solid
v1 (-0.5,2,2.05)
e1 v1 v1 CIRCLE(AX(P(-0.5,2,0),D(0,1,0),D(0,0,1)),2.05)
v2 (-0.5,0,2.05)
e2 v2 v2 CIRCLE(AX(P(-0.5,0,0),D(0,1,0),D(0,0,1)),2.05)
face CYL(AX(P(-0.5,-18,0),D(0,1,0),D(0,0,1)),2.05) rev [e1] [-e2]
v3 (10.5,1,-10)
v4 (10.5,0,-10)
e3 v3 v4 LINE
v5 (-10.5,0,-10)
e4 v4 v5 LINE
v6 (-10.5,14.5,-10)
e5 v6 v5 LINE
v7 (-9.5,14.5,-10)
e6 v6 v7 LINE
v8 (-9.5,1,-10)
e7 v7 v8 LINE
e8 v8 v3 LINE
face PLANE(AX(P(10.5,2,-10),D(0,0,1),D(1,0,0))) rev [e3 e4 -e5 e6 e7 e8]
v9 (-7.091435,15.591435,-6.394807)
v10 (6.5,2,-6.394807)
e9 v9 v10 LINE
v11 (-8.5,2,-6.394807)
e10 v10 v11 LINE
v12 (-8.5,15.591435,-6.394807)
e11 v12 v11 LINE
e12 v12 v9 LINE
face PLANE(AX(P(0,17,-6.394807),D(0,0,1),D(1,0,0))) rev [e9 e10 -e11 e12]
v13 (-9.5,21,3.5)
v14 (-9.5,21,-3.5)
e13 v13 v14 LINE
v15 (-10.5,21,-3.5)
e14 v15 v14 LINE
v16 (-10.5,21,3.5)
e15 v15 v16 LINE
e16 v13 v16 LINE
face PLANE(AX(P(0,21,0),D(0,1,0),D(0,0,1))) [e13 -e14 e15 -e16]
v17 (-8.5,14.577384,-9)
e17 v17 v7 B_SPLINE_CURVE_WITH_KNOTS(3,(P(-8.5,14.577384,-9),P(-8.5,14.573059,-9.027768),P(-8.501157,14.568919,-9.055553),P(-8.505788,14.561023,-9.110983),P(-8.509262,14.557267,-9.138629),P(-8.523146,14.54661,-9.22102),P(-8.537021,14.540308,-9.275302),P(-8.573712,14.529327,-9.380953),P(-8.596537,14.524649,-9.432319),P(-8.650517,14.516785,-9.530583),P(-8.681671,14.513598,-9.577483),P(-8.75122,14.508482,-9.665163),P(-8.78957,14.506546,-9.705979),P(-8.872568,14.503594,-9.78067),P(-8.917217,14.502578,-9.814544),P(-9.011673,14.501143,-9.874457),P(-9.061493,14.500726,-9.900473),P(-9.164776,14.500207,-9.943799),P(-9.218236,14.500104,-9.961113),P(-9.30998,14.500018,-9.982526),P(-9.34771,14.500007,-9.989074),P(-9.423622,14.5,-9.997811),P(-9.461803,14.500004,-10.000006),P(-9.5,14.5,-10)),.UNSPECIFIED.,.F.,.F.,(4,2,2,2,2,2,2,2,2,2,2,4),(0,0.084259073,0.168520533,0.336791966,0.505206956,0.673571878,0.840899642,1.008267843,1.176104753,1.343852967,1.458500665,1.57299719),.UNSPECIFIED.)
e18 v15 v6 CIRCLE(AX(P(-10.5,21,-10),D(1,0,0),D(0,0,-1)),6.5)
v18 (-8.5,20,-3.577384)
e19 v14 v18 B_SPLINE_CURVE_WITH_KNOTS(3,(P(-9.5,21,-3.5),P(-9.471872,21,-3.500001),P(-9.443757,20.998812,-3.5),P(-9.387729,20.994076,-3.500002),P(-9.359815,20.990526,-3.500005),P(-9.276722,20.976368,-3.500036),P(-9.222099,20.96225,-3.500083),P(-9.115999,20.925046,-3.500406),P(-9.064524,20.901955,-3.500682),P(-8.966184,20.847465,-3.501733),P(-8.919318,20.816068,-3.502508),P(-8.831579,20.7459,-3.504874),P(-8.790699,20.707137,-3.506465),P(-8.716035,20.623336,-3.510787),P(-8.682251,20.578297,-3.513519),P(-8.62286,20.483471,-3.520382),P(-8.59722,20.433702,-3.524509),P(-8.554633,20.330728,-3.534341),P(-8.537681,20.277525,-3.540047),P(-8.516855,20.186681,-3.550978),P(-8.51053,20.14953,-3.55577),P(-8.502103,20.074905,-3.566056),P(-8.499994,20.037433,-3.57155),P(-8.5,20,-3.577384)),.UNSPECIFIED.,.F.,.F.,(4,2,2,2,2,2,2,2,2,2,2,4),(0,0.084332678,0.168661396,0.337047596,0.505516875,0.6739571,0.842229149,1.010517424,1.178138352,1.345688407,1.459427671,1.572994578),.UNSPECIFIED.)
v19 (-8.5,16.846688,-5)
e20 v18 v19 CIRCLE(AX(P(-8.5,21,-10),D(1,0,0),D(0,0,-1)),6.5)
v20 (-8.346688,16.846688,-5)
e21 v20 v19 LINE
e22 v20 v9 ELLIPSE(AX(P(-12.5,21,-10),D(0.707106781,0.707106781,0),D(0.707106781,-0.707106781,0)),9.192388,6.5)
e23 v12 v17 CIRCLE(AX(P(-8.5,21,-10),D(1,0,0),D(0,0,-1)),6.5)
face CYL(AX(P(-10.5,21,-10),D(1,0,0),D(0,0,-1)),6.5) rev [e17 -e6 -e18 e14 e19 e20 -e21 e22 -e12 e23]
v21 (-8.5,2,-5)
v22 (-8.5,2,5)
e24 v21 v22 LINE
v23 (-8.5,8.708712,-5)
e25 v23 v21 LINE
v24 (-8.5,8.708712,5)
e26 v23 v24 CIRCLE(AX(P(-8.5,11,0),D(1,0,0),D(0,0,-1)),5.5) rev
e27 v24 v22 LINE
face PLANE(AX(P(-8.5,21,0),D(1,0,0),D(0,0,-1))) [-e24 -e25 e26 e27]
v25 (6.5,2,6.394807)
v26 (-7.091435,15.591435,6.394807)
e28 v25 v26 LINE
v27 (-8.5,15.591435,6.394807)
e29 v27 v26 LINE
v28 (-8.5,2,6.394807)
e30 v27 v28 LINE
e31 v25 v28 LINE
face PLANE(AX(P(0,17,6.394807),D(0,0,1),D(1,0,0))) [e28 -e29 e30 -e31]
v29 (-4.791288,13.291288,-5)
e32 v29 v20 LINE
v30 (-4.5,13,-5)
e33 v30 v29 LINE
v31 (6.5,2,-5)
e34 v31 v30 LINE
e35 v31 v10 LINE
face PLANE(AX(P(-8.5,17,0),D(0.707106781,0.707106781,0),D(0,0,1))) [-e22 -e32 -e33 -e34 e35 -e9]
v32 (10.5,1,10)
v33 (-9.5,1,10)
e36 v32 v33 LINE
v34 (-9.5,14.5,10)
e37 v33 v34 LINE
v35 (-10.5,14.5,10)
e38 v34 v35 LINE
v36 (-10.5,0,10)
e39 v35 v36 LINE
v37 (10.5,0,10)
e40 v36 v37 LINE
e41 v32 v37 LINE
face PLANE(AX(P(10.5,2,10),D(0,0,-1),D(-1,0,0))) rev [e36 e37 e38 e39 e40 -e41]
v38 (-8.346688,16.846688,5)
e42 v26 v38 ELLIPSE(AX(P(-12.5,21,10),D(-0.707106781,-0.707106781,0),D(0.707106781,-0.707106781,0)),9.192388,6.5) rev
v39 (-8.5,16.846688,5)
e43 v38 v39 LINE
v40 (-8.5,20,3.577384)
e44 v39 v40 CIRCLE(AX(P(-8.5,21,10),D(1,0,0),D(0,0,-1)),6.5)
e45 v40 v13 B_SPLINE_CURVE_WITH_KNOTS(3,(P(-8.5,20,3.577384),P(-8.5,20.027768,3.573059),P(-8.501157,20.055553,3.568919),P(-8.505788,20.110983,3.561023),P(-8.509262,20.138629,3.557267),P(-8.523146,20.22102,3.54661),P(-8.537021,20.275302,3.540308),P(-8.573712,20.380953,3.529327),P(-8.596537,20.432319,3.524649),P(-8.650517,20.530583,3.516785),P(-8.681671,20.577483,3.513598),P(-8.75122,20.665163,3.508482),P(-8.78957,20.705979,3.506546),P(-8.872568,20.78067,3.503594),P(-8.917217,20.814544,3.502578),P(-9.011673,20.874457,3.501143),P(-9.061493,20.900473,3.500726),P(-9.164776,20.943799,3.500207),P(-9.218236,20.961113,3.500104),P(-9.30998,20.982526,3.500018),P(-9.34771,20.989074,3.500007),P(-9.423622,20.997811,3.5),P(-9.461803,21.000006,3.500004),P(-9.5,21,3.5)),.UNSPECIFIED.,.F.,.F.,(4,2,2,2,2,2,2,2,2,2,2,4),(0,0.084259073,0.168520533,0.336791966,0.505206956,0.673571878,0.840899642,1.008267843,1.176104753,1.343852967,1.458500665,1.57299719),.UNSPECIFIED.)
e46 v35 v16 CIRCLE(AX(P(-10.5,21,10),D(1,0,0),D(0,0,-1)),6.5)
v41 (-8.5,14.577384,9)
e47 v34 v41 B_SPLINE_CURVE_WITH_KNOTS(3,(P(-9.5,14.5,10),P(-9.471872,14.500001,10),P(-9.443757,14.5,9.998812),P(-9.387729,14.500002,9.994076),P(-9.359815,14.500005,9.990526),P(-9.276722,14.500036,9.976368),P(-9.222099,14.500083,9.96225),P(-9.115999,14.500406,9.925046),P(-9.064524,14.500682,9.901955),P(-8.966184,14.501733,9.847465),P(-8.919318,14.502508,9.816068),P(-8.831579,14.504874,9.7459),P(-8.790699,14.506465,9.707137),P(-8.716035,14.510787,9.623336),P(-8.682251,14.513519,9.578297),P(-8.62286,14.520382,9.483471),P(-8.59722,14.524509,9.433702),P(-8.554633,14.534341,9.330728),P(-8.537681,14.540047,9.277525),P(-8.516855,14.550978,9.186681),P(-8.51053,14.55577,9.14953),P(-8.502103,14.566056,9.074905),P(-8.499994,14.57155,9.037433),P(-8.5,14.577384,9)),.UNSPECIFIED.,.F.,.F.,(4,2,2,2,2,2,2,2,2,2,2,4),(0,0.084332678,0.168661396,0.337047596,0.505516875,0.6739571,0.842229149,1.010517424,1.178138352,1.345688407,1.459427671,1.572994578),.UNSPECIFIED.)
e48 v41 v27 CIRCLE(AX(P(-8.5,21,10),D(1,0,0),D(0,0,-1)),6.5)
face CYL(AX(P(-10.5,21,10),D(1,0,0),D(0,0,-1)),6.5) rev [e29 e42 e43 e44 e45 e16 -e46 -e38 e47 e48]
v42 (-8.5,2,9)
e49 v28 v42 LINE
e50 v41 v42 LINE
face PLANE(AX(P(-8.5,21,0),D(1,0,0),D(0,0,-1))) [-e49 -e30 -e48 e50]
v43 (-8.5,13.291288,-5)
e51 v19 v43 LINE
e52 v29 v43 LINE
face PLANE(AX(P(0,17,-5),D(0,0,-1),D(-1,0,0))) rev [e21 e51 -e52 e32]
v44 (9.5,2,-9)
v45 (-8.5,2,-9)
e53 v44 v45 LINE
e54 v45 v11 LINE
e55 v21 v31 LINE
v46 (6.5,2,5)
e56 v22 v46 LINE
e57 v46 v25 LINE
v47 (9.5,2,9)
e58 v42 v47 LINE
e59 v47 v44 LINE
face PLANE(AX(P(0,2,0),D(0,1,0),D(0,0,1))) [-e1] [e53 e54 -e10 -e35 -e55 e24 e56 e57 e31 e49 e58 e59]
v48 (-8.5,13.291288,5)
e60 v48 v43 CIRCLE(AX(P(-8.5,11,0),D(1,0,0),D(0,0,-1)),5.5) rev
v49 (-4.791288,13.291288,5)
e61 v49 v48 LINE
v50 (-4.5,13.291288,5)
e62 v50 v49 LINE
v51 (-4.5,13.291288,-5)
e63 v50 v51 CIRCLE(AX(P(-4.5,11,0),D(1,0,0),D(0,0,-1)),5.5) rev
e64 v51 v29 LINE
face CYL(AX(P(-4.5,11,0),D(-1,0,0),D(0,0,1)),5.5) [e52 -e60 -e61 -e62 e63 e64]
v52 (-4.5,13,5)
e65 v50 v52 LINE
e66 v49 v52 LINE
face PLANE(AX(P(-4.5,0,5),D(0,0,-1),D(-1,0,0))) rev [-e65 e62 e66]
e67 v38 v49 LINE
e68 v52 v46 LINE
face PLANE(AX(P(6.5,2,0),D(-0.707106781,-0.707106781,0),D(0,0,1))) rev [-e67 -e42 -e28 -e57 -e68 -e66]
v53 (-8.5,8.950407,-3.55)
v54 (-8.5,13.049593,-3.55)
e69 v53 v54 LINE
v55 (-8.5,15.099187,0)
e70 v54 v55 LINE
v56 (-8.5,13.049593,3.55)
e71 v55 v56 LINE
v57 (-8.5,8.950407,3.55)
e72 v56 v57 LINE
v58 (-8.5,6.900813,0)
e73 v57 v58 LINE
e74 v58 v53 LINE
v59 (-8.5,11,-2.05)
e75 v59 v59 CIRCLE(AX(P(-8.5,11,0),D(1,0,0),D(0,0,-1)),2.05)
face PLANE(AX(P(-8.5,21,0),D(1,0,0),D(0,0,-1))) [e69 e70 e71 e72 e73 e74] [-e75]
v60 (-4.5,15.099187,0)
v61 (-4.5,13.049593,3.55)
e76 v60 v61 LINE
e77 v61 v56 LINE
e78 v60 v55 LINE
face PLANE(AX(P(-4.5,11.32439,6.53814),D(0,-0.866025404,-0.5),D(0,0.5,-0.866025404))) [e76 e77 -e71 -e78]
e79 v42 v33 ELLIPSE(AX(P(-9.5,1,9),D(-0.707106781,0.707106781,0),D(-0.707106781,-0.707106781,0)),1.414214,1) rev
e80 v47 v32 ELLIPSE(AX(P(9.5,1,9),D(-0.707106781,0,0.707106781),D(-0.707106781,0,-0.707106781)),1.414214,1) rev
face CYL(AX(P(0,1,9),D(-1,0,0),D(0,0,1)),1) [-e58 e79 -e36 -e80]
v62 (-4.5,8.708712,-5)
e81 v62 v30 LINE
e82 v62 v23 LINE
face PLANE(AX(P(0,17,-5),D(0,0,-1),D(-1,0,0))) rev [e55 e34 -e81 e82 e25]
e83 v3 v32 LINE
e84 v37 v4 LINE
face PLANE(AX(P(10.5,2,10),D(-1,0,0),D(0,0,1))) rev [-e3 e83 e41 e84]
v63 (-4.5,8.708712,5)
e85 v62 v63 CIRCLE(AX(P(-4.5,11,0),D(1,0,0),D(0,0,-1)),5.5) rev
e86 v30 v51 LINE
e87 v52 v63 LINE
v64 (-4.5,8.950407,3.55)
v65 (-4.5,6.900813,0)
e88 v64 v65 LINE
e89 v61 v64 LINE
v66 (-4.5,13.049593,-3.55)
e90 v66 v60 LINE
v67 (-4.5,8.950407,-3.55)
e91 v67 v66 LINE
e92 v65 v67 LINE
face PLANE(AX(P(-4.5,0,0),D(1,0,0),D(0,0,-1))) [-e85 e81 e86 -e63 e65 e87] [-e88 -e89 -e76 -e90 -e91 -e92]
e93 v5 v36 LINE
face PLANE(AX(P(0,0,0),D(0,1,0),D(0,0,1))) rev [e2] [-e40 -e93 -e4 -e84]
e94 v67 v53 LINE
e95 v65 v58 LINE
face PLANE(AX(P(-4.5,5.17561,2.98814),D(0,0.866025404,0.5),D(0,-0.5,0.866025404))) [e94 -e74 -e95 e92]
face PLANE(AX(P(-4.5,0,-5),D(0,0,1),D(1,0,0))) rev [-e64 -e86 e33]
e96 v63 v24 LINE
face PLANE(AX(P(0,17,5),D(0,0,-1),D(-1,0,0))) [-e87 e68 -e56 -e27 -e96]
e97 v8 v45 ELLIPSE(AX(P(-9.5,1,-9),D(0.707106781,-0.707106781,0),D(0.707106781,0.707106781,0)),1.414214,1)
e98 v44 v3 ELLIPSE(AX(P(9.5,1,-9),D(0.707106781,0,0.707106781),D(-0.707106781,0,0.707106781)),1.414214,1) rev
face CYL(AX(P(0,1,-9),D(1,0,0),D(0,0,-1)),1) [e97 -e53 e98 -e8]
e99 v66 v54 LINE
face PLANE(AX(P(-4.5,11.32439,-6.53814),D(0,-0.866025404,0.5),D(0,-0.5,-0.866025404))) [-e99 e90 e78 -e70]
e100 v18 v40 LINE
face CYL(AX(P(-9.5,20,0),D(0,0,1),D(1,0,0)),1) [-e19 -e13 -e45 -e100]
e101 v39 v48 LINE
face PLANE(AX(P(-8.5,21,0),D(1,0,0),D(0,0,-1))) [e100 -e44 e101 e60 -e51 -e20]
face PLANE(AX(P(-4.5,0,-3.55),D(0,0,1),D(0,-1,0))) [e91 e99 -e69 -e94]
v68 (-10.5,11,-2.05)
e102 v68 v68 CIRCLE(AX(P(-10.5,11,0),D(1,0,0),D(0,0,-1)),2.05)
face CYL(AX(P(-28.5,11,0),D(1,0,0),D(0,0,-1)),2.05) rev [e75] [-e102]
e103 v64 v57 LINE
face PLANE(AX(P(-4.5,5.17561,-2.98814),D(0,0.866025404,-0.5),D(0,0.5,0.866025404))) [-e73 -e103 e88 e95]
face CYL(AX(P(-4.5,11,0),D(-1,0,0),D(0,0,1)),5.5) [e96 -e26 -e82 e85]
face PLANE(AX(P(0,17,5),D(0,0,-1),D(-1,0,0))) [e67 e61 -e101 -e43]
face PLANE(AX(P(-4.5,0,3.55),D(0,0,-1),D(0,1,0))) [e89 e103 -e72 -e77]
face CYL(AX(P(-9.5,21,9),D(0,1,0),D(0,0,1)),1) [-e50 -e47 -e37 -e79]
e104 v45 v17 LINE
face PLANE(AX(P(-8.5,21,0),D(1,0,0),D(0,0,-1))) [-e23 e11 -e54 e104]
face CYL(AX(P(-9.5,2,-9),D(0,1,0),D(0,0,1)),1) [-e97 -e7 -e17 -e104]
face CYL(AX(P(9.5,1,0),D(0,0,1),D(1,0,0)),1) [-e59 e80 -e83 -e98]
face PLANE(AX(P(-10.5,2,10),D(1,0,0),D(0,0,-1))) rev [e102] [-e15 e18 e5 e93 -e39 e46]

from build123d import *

# Parameters (mm, degrees)
ESQUISSE1_W                  = 21
ESQUISSE1_H                  = 20
BOSS_EXTRU_1_DEPTH           = 2
ESQUISSE2_W                  = 2
ESQUISSE2_H                  = 20
BOSS_EXTRU_2_DEPTH           = 19
ESQUISSE3_R                  = 2.05
ENL_V_MAT_EXTRU_1_DEPTH      = 20
ESQUISSE4_R                  = 2.05
ENL_V_MAT_EXTRU_2_DEPTH      = 20
ESQUISSE5_W                  = 15
ESQUISSE5_H                  = 1.39480656
BOSS_EXTRU_3_DEPTH           = 15
CHANFREIN1_SIZE              = 15
CONG_1_R                     = 1
BOSS_EXTRU_12_DEPTH          = 4
ENL_V_MAT_EXTRU_3_DEPTH      = 26.51960031
ENL_V_MAT_EXTRU_3_DEPTH_BACK = 26.51960031
ESQUISSE9_R                  = 6.5


with BuildPart() as part:
    # Esquisse1 → Boss.-Extru.1 (new body)
    with BuildSketch(Plane(origin=(0, 0, 0), x_dir=(1, 0, 0), z_dir=(0, 1, 0))):
        Rectangle(ESQUISSE1_W, ESQUISSE1_H)
    extrude(amount=BOSS_EXTRU_1_DEPTH)

    # Esquisse2 → Boss.-Extru.2 (add)
    with BuildSketch(Plane(origin=(0, 2, 0), x_dir=(1, 0, 0), z_dir=(0, 1, 0))):
        with Locations((-9.5, 0)):
            Rectangle(ESQUISSE2_W, ESQUISSE2_H)
    extrude(amount=BOSS_EXTRU_2_DEPTH)

    # Esquisse3 → Enlèv. mat.-Extru.1 (cut)
    with BuildSketch(Plane(origin=(0, 2, 0), x_dir=(1, 0, 0), z_dir=(0, 1, 0))):
        with Locations(Location((-0.5, 0, 0), (0, 0, 270))):
            Circle(ESQUISSE3_R)
    extrude(amount=-ENL_V_MAT_EXTRU_1_DEPTH, mode=Mode.SUBTRACT)

    # Esquisse4 → Enlèv. mat.-Extru.2 (cut)
    with BuildSketch(Plane(origin=(-8.5, 0, 0), x_dir=(0, 0, -1), z_dir=(1, 0, 0))):
        with Locations((0, 11)):
            Circle(ESQUISSE4_R)
    extrude(amount=-ENL_V_MAT_EXTRU_2_DEPTH, mode=Mode.SUBTRACT)

    # Esquisse5 → Boss.-Extru.3 (add)
    with BuildSketch(Plane(origin=(0, 2, 0), x_dir=(1, 0, 0), z_dir=(0, 1, 0))):
        with Locations((-1, -5.69740328)):
            Rectangle(ESQUISSE5_W, ESQUISSE5_H)
        with Locations((-1, 5.69740328)):
            Rectangle(ESQUISSE5_W, ESQUISSE5_H)
    extrude(amount=BOSS_EXTRU_3_DEPTH)

    # Chanfrein1
    chanfrein1_edges = [part.edges().sort_by_distance(p)[0] for p in [
        (6.5, 17, 5.69740328),
        (6.5, 17, -5.69740328),
    ]]
    chamfer(chanfrein1_edges, length=CHANFREIN1_SIZE - 0.0001)  # a hair under: the kernel refuses the full size

    # Congé1
    cong_1_edges = [part.edges().sort_by_distance(p)[0] for p in [
        (10.5, 2, 0),
        (1, 2, 10),
        (-8.5, 21, 0),
        (-8.5, 11.5, 10),
        (-8.5, 11.5, -10),
        (1, 2, -10),
    ]]
    fillet(cong_1_edges, radius=CONG_1_R)

    # Esquisse7 → Boss.-Extru.12 (add)
    with BuildSketch(Plane(origin=(-8.5, 0, 0), x_dir=(0, 0, -1), z_dir=(1, 0, 0))):
        with BuildLine():
            Line((5, 8.708712153), (5, 13.291287847))
            ThreePointArc((5, 13.291287847), (0, 16.5), (-5, 13.291287847))
            Line((-5, 13.291287847), (-5, 8.708712153))
            ThreePointArc((-5, 8.708712153), (0, 5.5), (5, 8.708712153))
        make_face()
        Polygon((3.55, 8.950406544), (0, 6.900813089), (-3.55, 8.950406544), (-3.55, 13.049593456), (0, 15.099186911), (3.55, 13.049593456), align=None, mode=Mode.SUBTRACT)
    extrude(amount=BOSS_EXTRU_12_DEPTH)

    # Esquisse9 → Enlèv. mat.-Extru.3 (cut, two sides: drawn at the far end of the back side and taken through both)
    with BuildSketch(Plane(origin=(0, 0, 0), x_dir=(0, 0, -1), z_dir=(1, 0, 0)).offset(-ENL_V_MAT_EXTRU_3_DEPTH_BACK)):
        with Locations((-10, 21)):
            Circle(ESQUISSE9_R)
        with Locations((10, 21)):
            Circle(ESQUISSE9_R)
    extrude(amount=ENL_V_MAT_EXTRU_3_DEPTH + ENL_V_MAT_EXTRU_3_DEPTH_BACK, mode=Mode.SUBTRACT)


solid = part.part
